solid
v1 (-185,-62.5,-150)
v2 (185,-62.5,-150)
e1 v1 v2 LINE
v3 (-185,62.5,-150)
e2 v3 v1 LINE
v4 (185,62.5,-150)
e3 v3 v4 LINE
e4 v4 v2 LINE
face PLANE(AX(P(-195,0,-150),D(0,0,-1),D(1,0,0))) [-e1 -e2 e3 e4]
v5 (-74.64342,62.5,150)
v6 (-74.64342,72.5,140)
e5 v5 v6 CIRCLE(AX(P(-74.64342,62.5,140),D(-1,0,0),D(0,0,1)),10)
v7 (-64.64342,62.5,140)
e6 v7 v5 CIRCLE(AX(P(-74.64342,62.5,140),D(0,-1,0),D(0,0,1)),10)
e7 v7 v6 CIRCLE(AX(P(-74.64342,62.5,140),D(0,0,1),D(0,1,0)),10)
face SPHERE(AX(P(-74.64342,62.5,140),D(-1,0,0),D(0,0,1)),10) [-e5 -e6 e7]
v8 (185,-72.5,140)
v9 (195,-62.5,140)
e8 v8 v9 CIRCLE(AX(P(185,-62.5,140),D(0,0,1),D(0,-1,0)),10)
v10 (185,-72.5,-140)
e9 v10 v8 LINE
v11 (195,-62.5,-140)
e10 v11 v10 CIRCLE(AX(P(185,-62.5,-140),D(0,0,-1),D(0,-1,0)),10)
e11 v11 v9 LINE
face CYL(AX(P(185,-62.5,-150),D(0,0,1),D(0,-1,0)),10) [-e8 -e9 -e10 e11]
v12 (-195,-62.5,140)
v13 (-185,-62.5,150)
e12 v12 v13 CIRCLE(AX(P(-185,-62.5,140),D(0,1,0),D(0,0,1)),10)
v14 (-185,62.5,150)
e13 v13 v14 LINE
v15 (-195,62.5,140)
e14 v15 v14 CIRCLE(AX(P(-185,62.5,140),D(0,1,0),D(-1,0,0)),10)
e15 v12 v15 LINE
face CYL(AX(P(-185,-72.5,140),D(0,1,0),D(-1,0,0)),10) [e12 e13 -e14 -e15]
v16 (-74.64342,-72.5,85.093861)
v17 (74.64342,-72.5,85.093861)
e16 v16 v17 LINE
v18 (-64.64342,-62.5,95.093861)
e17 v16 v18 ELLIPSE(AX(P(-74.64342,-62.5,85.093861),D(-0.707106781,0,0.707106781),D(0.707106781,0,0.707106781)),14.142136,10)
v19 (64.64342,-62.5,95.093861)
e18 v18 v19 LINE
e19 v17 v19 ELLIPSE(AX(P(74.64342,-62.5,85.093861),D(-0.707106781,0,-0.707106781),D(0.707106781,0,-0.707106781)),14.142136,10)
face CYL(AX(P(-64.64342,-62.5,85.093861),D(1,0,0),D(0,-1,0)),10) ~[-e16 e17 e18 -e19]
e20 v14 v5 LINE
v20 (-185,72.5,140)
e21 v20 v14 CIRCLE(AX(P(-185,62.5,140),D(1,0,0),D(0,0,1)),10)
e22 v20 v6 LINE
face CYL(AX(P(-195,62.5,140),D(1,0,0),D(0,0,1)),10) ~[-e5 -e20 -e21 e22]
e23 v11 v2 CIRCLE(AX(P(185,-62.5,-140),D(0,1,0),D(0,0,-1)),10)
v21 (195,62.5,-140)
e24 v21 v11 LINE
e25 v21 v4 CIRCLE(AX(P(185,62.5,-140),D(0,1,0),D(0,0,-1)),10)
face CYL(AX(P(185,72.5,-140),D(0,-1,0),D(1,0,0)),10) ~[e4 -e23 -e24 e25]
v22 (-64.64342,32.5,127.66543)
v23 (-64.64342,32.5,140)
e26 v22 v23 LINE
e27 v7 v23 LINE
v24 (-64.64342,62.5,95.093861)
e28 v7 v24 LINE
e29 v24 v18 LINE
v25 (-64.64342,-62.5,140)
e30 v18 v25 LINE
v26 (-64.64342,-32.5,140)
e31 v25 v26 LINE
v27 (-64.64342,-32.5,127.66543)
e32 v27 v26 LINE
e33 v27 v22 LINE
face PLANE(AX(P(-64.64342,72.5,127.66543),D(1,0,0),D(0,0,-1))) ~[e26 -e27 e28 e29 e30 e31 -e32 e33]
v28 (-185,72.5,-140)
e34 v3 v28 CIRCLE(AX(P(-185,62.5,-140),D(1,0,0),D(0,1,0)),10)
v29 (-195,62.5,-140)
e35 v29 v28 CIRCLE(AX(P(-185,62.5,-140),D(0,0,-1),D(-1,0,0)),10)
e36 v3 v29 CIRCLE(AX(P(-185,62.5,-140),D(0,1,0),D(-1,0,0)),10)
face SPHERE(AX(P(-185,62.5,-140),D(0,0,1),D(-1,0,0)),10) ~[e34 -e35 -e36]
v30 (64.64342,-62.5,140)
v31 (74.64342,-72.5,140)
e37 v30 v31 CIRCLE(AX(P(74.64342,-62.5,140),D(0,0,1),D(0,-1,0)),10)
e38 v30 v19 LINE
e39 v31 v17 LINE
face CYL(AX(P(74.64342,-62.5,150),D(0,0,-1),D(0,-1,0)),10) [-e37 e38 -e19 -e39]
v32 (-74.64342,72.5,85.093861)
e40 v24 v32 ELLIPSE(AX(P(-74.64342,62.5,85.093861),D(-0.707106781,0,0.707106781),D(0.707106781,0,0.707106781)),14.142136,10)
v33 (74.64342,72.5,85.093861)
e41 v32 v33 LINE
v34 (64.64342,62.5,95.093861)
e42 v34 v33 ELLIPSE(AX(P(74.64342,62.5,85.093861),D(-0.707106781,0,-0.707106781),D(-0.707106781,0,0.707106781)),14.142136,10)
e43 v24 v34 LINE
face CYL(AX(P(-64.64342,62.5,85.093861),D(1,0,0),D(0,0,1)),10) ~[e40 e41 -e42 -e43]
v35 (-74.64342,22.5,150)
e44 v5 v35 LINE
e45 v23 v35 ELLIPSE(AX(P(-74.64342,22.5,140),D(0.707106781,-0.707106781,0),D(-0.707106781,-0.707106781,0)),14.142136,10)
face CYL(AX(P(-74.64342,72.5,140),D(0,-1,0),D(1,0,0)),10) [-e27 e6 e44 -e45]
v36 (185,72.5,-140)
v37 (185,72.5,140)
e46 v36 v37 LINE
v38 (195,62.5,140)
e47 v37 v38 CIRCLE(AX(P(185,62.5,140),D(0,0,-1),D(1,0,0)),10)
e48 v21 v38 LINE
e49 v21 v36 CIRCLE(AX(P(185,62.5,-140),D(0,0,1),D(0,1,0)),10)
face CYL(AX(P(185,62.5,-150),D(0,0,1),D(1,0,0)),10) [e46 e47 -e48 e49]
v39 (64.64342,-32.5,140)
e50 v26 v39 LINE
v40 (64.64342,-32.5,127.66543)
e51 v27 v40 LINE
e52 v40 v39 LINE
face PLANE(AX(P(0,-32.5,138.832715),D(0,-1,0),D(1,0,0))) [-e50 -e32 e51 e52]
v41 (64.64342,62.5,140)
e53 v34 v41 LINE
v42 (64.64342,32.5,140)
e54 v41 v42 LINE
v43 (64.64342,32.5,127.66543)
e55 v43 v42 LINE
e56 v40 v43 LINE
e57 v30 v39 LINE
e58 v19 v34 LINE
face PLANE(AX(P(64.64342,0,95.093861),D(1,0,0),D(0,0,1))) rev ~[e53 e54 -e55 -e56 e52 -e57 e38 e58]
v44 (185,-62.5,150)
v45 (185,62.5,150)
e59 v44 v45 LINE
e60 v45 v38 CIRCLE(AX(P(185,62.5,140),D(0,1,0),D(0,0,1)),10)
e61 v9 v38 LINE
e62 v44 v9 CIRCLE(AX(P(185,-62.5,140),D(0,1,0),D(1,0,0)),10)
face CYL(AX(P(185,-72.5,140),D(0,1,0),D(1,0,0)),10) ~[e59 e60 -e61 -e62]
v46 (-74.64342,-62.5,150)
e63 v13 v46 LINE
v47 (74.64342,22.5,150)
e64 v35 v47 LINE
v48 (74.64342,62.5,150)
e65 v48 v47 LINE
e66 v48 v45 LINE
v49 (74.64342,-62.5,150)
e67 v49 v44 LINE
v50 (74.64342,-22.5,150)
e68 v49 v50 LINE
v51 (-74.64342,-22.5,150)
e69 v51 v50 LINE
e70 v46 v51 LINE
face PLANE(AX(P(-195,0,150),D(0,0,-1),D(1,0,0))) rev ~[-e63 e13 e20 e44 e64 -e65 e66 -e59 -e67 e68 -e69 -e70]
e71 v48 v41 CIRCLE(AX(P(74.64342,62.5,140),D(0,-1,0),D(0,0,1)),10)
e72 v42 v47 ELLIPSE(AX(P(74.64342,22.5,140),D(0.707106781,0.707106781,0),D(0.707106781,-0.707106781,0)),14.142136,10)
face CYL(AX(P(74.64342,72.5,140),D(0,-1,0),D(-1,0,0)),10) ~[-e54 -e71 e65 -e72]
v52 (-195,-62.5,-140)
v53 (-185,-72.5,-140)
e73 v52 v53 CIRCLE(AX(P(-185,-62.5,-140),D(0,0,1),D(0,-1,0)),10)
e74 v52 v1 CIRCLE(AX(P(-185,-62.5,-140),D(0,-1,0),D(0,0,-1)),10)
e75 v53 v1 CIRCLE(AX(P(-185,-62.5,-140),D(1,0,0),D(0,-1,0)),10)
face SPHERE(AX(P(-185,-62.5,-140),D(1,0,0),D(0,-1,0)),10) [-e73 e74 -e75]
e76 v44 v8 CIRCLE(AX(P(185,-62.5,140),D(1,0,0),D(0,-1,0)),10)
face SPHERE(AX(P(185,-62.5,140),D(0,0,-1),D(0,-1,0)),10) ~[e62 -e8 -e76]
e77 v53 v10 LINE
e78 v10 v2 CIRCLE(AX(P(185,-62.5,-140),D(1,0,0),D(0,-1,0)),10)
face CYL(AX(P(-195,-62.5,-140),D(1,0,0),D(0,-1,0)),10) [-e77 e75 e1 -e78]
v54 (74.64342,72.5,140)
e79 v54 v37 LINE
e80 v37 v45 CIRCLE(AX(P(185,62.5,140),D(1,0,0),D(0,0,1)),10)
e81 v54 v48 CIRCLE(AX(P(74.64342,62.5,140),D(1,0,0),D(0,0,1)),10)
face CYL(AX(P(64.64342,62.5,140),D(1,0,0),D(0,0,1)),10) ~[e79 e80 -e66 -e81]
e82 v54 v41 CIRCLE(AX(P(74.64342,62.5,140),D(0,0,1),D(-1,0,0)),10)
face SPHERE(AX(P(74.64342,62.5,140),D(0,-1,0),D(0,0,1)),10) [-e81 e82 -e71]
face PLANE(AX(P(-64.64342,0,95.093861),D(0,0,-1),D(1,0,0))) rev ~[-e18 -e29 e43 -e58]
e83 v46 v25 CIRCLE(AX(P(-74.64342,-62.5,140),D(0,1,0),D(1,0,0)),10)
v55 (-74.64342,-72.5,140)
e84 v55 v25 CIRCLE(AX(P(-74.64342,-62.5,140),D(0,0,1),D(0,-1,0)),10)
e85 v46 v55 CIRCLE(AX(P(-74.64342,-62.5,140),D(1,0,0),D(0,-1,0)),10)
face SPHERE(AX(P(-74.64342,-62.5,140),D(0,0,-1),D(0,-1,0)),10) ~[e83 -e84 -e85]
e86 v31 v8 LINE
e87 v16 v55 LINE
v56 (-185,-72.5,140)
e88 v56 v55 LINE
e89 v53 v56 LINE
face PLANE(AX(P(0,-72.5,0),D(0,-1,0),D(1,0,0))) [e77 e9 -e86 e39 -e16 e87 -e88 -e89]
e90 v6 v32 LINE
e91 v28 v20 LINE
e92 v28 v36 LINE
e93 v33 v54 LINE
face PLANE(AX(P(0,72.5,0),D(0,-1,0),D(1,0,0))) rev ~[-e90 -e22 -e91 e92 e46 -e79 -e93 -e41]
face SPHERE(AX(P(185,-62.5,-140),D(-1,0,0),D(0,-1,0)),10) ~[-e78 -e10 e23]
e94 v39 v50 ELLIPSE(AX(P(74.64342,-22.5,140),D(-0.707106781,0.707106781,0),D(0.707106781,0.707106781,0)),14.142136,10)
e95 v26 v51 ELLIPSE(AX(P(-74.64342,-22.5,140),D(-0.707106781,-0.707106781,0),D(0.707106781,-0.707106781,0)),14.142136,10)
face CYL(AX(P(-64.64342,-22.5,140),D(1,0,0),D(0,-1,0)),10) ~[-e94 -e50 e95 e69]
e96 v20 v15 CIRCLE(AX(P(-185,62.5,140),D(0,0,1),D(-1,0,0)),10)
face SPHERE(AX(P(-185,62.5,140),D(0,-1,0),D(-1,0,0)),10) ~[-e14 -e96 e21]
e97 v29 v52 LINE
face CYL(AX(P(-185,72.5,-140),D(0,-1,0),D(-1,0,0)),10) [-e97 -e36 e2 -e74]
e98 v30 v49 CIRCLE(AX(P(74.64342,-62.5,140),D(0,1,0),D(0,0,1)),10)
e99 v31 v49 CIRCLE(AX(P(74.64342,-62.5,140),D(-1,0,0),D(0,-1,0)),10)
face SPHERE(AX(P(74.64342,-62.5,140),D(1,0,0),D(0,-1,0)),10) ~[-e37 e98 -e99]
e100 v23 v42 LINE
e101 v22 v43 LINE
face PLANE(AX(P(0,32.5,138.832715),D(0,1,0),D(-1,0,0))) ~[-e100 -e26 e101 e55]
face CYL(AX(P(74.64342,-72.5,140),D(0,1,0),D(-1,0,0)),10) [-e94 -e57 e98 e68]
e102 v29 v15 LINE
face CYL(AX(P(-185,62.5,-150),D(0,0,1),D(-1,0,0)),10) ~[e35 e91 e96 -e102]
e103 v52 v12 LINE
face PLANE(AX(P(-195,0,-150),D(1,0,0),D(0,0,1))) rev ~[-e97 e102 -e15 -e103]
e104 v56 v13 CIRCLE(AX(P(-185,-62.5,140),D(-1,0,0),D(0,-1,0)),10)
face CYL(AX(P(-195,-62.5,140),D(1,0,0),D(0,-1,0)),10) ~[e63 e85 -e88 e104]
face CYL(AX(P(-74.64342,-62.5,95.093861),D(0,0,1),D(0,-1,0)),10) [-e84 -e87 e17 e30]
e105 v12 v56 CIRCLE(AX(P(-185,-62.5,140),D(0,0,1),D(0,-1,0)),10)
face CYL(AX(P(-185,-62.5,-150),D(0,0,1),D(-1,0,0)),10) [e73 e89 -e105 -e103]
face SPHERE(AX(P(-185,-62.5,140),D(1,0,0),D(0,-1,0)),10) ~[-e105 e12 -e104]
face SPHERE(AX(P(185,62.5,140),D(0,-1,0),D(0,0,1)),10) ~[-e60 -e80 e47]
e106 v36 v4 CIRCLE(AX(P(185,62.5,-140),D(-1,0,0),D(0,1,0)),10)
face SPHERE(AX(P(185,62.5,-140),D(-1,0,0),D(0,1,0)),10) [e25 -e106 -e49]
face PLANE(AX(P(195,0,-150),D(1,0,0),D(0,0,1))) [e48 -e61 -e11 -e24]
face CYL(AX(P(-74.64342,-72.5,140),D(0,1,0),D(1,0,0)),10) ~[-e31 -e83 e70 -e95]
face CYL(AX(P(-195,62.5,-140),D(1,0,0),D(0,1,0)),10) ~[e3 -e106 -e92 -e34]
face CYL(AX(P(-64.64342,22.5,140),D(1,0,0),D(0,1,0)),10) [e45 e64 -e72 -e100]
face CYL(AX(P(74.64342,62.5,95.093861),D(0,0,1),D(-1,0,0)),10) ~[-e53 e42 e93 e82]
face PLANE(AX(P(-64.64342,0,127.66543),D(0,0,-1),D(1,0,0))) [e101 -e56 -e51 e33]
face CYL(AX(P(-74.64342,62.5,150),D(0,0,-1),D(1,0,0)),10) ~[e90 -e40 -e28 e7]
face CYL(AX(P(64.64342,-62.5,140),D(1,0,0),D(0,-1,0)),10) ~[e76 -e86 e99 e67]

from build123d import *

# Parameters (mm, degrees)
F0_W     = 390
F0_H     = 300
F0_W_2   = 129.2868405581
F0_H_2   = 32.5715690851
F1_DEPTH = 72.5
F2_W     = 129.2868405581
F2_H     = 22.3345696926
F3_DEPTH = 40
F4_R     = 10


# Not quite as in the source:
# - a pattern or mirror of a feature is missing from the dataset's text; its kind, count and spacing are read off the source's solid


with BuildPart() as f1:
    # F0 (on Front) → F1 (new body, symmetric)
    with BuildSketch(Plane.XZ):
        Rectangle(F0_W, F0_H)
        with Locations((0, 111.3796457648)):
            Rectangle(F0_W_2, F0_H_2, mode=Mode.SUBTRACT)
    extrude(amount=F1_DEPTH, both=True)

    # F2 (on face) → F3 (cut)
    with BuildSketch(Plane.XZ.offset(72.5)):
        with Locations((0, 138.8327151537)):
            Rectangle(F2_W, F2_H)
    f3 = extrude(amount=-F3_DEPTH, mode=Mode.SUBTRACT)

    # F3_copies: F3 across plane
    add(f3.mirror(Plane.ZX), mode=Mode.SUBTRACT)

    # F4
    f4_edges = [f1.edges().sort_by_distance(p)[0] for p in [
        (0, -72.5, -150),
        (195, -72.5, 0),
        (129.82171, -72.5, 150),
        (64.64342, -72.5, 122.546931),
        (0, -72.5, 95.093861),
        (-64.64342, -72.5, 122.546931),
        (-129.82171, -72.5, 150),
        (-195, -72.5, 0),
        (-195, 0, 150),
        (-195, 72.5, 0),
        (-195, 0, -150),
        (195, 0, 150),
        (64.64342, -52.5, 150),
        (0, -32.5, 150),
        (-64.64342, -52.5, 150),
        (-129.82171, 72.5, 150),
        (-64.64342, 52.5, 150),
        (0, 32.5, 150),
        (64.64342, 52.5, 150),
        (129.82171, 72.5, 150),
        (0, 72.5, -150),
        (195, 72.5, 0),
        (64.64342, 72.5, 122.546931),
        (0, 72.5, 95.093861),
        (-64.64342, 72.5, 122.546931),
        (195, 0, -150),
    ]]
    fillet(f4_edges, radius=F4_R)


solid = f1.part
